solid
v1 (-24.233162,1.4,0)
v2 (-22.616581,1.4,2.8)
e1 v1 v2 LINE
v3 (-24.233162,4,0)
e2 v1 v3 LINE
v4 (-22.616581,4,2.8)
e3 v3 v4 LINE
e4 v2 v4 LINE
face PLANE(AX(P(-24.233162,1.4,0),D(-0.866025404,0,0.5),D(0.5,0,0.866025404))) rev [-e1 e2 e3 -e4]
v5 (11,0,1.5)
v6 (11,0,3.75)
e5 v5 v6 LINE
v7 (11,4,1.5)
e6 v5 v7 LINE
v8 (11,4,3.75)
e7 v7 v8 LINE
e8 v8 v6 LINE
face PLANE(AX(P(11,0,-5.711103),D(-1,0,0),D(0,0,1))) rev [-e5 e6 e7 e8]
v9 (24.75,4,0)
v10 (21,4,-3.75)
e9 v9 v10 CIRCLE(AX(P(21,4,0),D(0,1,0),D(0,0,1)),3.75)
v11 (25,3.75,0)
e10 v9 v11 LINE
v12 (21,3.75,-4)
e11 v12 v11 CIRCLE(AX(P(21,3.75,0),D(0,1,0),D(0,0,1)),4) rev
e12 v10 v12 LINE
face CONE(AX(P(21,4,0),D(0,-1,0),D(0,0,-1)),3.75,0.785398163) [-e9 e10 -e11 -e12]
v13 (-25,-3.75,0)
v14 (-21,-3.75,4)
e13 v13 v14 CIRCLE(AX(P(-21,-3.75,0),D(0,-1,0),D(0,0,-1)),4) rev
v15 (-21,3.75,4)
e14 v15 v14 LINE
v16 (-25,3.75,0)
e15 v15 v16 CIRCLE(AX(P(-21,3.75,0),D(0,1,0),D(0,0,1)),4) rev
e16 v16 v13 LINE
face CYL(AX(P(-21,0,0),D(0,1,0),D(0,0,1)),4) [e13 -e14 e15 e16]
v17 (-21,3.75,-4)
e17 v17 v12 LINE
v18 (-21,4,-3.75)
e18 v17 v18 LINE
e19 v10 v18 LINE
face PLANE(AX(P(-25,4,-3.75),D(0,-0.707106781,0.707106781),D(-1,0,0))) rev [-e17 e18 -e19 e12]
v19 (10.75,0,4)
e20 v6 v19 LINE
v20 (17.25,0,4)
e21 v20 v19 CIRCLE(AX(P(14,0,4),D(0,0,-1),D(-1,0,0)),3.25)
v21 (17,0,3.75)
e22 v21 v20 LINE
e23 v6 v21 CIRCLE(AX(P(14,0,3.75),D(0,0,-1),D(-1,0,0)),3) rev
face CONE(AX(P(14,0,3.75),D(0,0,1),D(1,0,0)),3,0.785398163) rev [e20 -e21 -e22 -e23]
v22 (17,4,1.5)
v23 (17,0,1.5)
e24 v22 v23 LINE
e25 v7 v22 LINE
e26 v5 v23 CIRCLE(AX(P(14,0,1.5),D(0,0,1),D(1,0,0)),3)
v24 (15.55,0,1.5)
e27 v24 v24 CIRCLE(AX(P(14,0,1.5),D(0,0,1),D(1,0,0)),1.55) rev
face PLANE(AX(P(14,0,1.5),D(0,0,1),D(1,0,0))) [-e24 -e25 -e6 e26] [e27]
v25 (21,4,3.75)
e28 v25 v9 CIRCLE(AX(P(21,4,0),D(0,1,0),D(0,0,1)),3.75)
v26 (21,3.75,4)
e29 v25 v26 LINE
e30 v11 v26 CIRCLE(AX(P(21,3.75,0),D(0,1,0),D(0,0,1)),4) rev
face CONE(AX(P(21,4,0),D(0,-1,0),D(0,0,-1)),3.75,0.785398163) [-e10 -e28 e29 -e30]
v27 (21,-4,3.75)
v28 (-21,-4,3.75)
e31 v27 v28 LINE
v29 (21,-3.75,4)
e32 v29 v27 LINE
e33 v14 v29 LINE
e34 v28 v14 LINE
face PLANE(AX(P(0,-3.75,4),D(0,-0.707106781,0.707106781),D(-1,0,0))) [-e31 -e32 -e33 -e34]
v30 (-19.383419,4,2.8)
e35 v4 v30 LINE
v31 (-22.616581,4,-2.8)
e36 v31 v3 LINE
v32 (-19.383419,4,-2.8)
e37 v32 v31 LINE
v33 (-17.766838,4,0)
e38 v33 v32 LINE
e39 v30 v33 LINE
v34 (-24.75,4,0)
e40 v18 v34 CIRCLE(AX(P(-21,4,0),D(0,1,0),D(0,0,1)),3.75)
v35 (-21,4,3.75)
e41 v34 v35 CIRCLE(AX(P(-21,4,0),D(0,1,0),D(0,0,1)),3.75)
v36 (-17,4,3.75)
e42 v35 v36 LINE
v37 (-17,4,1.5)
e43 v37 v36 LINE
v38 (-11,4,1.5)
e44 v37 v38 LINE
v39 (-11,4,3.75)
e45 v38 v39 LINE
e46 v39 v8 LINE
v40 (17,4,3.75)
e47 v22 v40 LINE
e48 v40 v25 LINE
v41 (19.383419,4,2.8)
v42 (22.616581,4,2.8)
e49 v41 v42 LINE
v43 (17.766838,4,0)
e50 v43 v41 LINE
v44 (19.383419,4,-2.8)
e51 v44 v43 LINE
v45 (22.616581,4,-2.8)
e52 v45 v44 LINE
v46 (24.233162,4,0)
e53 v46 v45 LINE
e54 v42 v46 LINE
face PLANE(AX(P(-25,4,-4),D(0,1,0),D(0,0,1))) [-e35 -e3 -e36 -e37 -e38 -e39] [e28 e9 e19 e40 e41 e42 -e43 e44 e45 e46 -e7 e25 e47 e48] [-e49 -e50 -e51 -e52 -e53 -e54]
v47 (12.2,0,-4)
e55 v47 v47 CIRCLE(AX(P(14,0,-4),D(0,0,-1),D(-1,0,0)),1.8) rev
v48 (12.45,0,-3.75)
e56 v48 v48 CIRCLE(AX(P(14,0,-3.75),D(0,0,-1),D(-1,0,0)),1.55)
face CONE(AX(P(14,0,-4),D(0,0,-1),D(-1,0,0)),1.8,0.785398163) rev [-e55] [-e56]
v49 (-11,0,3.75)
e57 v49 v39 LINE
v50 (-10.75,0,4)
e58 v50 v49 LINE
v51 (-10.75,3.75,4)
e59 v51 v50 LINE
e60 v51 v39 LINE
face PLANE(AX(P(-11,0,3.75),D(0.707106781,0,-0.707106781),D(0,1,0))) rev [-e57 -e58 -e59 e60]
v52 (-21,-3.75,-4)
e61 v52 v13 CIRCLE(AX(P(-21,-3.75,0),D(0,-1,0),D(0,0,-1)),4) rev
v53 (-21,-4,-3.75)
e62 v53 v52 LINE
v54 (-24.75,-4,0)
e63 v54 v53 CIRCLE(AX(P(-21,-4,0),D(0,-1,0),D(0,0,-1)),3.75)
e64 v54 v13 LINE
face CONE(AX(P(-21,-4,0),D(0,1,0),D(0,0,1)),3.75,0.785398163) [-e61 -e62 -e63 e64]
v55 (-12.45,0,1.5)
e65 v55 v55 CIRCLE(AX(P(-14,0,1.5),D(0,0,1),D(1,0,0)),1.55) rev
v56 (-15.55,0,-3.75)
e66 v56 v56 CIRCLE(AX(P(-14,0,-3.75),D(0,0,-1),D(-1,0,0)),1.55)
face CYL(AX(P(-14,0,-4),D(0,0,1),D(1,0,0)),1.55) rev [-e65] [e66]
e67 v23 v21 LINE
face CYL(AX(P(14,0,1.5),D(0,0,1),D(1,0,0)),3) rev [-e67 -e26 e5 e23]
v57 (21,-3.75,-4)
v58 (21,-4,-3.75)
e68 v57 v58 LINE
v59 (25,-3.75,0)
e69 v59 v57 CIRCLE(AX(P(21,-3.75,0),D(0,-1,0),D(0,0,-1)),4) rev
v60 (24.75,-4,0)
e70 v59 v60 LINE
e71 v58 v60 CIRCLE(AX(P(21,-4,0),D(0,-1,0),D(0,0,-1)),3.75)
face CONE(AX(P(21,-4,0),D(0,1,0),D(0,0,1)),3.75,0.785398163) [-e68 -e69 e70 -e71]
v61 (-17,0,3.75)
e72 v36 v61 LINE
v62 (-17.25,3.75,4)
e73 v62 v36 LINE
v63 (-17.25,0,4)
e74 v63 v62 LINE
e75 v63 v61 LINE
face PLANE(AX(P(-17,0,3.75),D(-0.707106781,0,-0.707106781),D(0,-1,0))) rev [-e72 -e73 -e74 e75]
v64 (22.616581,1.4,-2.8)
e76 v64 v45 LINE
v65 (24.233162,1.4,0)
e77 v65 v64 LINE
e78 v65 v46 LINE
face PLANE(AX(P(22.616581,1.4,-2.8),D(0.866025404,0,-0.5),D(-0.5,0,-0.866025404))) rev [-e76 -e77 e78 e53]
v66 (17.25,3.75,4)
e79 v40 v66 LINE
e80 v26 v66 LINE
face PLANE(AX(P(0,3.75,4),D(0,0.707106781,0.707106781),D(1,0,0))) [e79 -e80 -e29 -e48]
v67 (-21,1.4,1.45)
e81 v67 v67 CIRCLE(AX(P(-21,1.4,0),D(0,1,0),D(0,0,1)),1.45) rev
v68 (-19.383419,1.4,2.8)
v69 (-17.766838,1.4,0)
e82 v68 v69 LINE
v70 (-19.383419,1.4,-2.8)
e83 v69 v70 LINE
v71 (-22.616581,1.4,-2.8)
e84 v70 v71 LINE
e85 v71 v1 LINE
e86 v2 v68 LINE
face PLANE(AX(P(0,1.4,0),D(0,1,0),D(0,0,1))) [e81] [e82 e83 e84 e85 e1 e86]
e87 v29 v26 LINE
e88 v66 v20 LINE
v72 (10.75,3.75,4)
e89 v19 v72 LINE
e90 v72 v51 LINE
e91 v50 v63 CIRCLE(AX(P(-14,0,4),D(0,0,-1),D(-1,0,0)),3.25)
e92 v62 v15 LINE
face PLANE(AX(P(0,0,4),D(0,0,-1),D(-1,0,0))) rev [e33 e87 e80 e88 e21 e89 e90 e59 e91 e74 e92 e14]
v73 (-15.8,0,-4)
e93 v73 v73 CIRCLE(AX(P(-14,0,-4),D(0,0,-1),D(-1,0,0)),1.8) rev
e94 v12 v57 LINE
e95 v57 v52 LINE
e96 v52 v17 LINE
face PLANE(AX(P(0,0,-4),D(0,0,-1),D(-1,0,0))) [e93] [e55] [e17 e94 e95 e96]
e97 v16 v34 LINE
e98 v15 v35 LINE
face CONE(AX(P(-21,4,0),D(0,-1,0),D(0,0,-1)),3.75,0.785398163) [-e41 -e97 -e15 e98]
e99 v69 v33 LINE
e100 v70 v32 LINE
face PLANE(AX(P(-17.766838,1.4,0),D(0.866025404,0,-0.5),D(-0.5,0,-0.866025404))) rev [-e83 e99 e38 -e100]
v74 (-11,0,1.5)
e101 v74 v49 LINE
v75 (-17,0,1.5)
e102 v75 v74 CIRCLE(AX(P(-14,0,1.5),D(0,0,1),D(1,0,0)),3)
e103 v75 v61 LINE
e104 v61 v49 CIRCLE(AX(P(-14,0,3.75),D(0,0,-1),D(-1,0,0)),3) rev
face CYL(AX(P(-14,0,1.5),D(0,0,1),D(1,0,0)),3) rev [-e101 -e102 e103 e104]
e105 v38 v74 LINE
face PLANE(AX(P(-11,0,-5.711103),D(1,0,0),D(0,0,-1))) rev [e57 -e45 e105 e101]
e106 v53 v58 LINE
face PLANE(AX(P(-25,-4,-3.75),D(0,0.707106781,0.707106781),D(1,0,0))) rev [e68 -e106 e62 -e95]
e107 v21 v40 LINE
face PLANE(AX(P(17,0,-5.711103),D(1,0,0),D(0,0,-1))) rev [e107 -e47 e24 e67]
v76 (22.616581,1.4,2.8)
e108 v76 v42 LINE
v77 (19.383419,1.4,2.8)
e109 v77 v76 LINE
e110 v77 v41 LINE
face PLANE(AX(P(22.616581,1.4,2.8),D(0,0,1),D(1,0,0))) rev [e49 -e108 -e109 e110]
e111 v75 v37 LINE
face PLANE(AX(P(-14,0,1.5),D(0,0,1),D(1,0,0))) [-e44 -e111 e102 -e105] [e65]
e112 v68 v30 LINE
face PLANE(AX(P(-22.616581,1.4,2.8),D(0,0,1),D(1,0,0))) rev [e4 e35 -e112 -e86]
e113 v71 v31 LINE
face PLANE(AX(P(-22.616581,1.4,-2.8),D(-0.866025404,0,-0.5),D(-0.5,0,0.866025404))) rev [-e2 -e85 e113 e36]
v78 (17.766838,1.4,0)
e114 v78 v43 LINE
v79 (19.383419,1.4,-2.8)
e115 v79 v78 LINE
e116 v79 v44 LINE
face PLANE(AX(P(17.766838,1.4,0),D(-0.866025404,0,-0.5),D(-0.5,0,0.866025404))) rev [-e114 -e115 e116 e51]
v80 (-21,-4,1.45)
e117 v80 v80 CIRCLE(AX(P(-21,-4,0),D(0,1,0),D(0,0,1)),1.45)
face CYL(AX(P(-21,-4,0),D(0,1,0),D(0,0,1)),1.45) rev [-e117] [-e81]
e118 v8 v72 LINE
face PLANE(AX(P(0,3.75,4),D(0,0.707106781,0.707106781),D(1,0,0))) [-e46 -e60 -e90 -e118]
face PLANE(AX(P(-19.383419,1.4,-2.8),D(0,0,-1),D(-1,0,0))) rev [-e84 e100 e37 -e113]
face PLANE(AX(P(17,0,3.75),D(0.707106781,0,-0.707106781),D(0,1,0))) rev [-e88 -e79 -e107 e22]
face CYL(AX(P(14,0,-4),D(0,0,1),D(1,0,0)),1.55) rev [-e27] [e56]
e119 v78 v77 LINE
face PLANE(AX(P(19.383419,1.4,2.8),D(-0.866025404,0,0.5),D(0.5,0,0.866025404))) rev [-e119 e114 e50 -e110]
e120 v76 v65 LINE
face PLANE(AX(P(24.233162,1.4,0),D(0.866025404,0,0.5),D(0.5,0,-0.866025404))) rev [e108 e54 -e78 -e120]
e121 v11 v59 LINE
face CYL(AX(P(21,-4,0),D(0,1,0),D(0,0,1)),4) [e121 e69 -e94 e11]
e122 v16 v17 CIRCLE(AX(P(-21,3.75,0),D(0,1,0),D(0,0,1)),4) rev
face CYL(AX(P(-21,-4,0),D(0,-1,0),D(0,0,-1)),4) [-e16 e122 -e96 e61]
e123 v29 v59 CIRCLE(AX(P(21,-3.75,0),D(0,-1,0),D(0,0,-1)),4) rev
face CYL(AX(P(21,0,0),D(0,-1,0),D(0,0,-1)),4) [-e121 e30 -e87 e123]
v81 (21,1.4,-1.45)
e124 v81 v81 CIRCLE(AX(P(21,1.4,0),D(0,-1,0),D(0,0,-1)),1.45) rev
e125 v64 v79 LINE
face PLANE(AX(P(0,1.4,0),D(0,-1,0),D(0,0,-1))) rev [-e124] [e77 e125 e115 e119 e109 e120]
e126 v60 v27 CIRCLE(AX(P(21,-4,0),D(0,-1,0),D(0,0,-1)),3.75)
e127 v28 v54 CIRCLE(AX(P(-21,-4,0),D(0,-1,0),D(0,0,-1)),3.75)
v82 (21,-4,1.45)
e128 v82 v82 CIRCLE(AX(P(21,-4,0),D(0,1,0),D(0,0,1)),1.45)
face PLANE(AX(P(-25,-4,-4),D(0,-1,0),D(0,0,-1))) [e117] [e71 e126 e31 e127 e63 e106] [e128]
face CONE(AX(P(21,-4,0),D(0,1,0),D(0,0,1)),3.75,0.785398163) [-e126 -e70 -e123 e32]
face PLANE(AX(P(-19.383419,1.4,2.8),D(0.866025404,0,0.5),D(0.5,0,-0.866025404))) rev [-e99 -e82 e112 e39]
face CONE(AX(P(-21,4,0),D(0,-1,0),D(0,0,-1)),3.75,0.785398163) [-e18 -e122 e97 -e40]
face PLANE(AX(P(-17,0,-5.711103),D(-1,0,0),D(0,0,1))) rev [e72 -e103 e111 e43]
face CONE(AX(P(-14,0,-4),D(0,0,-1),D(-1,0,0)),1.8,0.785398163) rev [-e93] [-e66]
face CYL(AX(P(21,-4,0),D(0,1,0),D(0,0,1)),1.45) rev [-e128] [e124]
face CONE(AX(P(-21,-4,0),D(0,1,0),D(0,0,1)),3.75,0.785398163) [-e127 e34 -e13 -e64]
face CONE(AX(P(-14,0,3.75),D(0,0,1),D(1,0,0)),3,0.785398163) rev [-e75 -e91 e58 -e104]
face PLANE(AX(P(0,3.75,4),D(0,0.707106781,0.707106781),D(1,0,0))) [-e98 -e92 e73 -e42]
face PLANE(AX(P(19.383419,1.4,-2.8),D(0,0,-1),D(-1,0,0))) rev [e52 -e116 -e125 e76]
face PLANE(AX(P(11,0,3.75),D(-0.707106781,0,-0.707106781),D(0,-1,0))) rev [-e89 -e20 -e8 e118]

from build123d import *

# Parameters (mm, degrees)
DODANIE_WYCI_GNI_CIE1_DEPTH      = 4
DODANIE_WYCI_GNI_CIE1_DEPTH_BACK = 4
SZKIC1_W                         = 50
SZKIC1_H                         = 8
SZKIC1_R                         = 1.55
SZKIC2_R                         = 1.45
WYTNIJ_WYCI_GNI_CIE1_DEPTH       = 27.551836095
WYTNIJ_WYCI_GNI_CIE2_DEPTH       = 2.6
SZKIC4_R                         = 3
WYTNIJ_WYCI_GNI_CIE3_DEPTH       = 2.5
ZAOKR_GLENIE1_R                  = 4
SZKIC5_W                         = 6
SZKIC5_H                         = 4
WYTNIJ_WYCI_GNI_CIE4_DEPTH       = 2.5
SFAZOWANIE1_SIZE                 = 0.25


with BuildPart() as part:
    # Szkic1 → Dodanie-wyciągnięcie1 (new, two sides: drawn at the far end of the back side and taken through both)
    with BuildSketch(Plane.XY.offset(-DODANIE_WYCI_GNI_CIE1_DEPTH_BACK)):
        Rectangle(SZKIC1_W, SZKIC1_H)
        with Locations((-14, 0)):
            Circle(SZKIC1_R, mode=Mode.SUBTRACT)
        with Locations((14, 0)):
            Circle(SZKIC1_R, mode=Mode.SUBTRACT)
    extrude(amount=DODANIE_WYCI_GNI_CIE1_DEPTH + DODANIE_WYCI_GNI_CIE1_DEPTH_BACK)

    # Szkic2 → Wytnij-wyciągnięcie1 (cut, through all)
    with BuildSketch(Plane(origin=(0, 4, 0), x_dir=(1, 0, 0), z_dir=(0, 1, 0))):
        with Locations(Location((-21, 0, 0), (0, 0, 270))):
            Circle(SZKIC2_R)
        with Locations(Location((21, 0, 0), (0, 0, 270))):
            Circle(SZKIC2_R)
    extrude(amount=-WYTNIJ_WYCI_GNI_CIE1_DEPTH, mode=Mode.SUBTRACT)

    # Szkic3 → Wytnij-wyciągnięcie2 (cut)
    with BuildSketch(Plane(origin=(0, 4, 0), x_dir=(1, 0, 0), z_dir=(0, 1, 0))):
        Polygon((-17.766838493, 0), (-19.383419246, 2.8), (-22.616580754, 2.8), (-24.233161507, 0), (-22.616580754, -2.8), (-19.383419246, -2.8), align=None)
        Polygon((19.383419246, -2.8), (17.766838493, 0), (19.383419246, 2.8), (22.616580754, 2.8), (24.233161507, 0), (22.616580754, -2.8), align=None)
    extrude(amount=-WYTNIJ_WYCI_GNI_CIE2_DEPTH, mode=Mode.SUBTRACT)

    # Szkic4 → Wytnij-wyciągnięcie3 (cut)
    with BuildSketch(Plane.XY.offset(4)):
        with Locations((-14, 0)):
            Circle(SZKIC4_R)
        with Locations((14, 0)):
            Circle(SZKIC4_R)
    extrude(amount=-WYTNIJ_WYCI_GNI_CIE3_DEPTH, mode=Mode.SUBTRACT)

    # Zaokrąglenie1
    zaokr_glenie1_edges = [part.edges().sort_by_distance(p)[0] for p in [
        (25, 0, -4),
        (25, 0, 4),
        (-25, 0, 4),
        (-25, 0, -4),
    ]]
    fillet(zaokr_glenie1_edges, radius=ZAOKR_GLENIE1_R - 0.0001)  # a hair under: the kernel refuses the full size

    # Szkic5 → Wytnij-wyciągnięcie4 (cut)
    with BuildSketch(Plane.XY.offset(4)):
        with Locations((-14, 2)):
            Rectangle(SZKIC5_W, SZKIC5_H)
        with Locations((14, 2)):
            Rectangle(SZKIC5_W, SZKIC5_H)
    extrude(amount=-WYTNIJ_WYCI_GNI_CIE4_DEPTH, mode=Mode.SUBTRACT)

    # Sfazowanie1
    sfazowanie1_edges = [part.edges().sort_by_distance(p)[0] for p in [
        (19.00005, 4, 4),
        (0, 4, -4),
        (-23.828456414, 4, -2.828456414),
        (-23.828456414, 4, 2.828456414),
        (23.828456414, 4, 2.828456414),
        (23.828456414, 4, -2.828456414),
        (0, -4, -4),
        (0, -4, 4),
        (-23.828456414, -4, -2.828456414),
        (-23.828456414, -4, 2.828456414),
        (23.828456414, -4, 2.828456414),
        (23.828456414, -4, -2.828456414),
        (-14, -3, 4),
        (-15.55, 0, -4),
        (14, -3, 4),
        (0, 4, 4),
        (-19.00005, 4, 4),
        (-11, 2, 4),
        (-17, 2, 4),
        (17, 2, 4),
        (11, 2, 4),
        (12.45, 0, -4),
    ]]
    chamfer(sfazowanie1_edges, length=SFAZOWANIE1_SIZE)


solid = part.part
